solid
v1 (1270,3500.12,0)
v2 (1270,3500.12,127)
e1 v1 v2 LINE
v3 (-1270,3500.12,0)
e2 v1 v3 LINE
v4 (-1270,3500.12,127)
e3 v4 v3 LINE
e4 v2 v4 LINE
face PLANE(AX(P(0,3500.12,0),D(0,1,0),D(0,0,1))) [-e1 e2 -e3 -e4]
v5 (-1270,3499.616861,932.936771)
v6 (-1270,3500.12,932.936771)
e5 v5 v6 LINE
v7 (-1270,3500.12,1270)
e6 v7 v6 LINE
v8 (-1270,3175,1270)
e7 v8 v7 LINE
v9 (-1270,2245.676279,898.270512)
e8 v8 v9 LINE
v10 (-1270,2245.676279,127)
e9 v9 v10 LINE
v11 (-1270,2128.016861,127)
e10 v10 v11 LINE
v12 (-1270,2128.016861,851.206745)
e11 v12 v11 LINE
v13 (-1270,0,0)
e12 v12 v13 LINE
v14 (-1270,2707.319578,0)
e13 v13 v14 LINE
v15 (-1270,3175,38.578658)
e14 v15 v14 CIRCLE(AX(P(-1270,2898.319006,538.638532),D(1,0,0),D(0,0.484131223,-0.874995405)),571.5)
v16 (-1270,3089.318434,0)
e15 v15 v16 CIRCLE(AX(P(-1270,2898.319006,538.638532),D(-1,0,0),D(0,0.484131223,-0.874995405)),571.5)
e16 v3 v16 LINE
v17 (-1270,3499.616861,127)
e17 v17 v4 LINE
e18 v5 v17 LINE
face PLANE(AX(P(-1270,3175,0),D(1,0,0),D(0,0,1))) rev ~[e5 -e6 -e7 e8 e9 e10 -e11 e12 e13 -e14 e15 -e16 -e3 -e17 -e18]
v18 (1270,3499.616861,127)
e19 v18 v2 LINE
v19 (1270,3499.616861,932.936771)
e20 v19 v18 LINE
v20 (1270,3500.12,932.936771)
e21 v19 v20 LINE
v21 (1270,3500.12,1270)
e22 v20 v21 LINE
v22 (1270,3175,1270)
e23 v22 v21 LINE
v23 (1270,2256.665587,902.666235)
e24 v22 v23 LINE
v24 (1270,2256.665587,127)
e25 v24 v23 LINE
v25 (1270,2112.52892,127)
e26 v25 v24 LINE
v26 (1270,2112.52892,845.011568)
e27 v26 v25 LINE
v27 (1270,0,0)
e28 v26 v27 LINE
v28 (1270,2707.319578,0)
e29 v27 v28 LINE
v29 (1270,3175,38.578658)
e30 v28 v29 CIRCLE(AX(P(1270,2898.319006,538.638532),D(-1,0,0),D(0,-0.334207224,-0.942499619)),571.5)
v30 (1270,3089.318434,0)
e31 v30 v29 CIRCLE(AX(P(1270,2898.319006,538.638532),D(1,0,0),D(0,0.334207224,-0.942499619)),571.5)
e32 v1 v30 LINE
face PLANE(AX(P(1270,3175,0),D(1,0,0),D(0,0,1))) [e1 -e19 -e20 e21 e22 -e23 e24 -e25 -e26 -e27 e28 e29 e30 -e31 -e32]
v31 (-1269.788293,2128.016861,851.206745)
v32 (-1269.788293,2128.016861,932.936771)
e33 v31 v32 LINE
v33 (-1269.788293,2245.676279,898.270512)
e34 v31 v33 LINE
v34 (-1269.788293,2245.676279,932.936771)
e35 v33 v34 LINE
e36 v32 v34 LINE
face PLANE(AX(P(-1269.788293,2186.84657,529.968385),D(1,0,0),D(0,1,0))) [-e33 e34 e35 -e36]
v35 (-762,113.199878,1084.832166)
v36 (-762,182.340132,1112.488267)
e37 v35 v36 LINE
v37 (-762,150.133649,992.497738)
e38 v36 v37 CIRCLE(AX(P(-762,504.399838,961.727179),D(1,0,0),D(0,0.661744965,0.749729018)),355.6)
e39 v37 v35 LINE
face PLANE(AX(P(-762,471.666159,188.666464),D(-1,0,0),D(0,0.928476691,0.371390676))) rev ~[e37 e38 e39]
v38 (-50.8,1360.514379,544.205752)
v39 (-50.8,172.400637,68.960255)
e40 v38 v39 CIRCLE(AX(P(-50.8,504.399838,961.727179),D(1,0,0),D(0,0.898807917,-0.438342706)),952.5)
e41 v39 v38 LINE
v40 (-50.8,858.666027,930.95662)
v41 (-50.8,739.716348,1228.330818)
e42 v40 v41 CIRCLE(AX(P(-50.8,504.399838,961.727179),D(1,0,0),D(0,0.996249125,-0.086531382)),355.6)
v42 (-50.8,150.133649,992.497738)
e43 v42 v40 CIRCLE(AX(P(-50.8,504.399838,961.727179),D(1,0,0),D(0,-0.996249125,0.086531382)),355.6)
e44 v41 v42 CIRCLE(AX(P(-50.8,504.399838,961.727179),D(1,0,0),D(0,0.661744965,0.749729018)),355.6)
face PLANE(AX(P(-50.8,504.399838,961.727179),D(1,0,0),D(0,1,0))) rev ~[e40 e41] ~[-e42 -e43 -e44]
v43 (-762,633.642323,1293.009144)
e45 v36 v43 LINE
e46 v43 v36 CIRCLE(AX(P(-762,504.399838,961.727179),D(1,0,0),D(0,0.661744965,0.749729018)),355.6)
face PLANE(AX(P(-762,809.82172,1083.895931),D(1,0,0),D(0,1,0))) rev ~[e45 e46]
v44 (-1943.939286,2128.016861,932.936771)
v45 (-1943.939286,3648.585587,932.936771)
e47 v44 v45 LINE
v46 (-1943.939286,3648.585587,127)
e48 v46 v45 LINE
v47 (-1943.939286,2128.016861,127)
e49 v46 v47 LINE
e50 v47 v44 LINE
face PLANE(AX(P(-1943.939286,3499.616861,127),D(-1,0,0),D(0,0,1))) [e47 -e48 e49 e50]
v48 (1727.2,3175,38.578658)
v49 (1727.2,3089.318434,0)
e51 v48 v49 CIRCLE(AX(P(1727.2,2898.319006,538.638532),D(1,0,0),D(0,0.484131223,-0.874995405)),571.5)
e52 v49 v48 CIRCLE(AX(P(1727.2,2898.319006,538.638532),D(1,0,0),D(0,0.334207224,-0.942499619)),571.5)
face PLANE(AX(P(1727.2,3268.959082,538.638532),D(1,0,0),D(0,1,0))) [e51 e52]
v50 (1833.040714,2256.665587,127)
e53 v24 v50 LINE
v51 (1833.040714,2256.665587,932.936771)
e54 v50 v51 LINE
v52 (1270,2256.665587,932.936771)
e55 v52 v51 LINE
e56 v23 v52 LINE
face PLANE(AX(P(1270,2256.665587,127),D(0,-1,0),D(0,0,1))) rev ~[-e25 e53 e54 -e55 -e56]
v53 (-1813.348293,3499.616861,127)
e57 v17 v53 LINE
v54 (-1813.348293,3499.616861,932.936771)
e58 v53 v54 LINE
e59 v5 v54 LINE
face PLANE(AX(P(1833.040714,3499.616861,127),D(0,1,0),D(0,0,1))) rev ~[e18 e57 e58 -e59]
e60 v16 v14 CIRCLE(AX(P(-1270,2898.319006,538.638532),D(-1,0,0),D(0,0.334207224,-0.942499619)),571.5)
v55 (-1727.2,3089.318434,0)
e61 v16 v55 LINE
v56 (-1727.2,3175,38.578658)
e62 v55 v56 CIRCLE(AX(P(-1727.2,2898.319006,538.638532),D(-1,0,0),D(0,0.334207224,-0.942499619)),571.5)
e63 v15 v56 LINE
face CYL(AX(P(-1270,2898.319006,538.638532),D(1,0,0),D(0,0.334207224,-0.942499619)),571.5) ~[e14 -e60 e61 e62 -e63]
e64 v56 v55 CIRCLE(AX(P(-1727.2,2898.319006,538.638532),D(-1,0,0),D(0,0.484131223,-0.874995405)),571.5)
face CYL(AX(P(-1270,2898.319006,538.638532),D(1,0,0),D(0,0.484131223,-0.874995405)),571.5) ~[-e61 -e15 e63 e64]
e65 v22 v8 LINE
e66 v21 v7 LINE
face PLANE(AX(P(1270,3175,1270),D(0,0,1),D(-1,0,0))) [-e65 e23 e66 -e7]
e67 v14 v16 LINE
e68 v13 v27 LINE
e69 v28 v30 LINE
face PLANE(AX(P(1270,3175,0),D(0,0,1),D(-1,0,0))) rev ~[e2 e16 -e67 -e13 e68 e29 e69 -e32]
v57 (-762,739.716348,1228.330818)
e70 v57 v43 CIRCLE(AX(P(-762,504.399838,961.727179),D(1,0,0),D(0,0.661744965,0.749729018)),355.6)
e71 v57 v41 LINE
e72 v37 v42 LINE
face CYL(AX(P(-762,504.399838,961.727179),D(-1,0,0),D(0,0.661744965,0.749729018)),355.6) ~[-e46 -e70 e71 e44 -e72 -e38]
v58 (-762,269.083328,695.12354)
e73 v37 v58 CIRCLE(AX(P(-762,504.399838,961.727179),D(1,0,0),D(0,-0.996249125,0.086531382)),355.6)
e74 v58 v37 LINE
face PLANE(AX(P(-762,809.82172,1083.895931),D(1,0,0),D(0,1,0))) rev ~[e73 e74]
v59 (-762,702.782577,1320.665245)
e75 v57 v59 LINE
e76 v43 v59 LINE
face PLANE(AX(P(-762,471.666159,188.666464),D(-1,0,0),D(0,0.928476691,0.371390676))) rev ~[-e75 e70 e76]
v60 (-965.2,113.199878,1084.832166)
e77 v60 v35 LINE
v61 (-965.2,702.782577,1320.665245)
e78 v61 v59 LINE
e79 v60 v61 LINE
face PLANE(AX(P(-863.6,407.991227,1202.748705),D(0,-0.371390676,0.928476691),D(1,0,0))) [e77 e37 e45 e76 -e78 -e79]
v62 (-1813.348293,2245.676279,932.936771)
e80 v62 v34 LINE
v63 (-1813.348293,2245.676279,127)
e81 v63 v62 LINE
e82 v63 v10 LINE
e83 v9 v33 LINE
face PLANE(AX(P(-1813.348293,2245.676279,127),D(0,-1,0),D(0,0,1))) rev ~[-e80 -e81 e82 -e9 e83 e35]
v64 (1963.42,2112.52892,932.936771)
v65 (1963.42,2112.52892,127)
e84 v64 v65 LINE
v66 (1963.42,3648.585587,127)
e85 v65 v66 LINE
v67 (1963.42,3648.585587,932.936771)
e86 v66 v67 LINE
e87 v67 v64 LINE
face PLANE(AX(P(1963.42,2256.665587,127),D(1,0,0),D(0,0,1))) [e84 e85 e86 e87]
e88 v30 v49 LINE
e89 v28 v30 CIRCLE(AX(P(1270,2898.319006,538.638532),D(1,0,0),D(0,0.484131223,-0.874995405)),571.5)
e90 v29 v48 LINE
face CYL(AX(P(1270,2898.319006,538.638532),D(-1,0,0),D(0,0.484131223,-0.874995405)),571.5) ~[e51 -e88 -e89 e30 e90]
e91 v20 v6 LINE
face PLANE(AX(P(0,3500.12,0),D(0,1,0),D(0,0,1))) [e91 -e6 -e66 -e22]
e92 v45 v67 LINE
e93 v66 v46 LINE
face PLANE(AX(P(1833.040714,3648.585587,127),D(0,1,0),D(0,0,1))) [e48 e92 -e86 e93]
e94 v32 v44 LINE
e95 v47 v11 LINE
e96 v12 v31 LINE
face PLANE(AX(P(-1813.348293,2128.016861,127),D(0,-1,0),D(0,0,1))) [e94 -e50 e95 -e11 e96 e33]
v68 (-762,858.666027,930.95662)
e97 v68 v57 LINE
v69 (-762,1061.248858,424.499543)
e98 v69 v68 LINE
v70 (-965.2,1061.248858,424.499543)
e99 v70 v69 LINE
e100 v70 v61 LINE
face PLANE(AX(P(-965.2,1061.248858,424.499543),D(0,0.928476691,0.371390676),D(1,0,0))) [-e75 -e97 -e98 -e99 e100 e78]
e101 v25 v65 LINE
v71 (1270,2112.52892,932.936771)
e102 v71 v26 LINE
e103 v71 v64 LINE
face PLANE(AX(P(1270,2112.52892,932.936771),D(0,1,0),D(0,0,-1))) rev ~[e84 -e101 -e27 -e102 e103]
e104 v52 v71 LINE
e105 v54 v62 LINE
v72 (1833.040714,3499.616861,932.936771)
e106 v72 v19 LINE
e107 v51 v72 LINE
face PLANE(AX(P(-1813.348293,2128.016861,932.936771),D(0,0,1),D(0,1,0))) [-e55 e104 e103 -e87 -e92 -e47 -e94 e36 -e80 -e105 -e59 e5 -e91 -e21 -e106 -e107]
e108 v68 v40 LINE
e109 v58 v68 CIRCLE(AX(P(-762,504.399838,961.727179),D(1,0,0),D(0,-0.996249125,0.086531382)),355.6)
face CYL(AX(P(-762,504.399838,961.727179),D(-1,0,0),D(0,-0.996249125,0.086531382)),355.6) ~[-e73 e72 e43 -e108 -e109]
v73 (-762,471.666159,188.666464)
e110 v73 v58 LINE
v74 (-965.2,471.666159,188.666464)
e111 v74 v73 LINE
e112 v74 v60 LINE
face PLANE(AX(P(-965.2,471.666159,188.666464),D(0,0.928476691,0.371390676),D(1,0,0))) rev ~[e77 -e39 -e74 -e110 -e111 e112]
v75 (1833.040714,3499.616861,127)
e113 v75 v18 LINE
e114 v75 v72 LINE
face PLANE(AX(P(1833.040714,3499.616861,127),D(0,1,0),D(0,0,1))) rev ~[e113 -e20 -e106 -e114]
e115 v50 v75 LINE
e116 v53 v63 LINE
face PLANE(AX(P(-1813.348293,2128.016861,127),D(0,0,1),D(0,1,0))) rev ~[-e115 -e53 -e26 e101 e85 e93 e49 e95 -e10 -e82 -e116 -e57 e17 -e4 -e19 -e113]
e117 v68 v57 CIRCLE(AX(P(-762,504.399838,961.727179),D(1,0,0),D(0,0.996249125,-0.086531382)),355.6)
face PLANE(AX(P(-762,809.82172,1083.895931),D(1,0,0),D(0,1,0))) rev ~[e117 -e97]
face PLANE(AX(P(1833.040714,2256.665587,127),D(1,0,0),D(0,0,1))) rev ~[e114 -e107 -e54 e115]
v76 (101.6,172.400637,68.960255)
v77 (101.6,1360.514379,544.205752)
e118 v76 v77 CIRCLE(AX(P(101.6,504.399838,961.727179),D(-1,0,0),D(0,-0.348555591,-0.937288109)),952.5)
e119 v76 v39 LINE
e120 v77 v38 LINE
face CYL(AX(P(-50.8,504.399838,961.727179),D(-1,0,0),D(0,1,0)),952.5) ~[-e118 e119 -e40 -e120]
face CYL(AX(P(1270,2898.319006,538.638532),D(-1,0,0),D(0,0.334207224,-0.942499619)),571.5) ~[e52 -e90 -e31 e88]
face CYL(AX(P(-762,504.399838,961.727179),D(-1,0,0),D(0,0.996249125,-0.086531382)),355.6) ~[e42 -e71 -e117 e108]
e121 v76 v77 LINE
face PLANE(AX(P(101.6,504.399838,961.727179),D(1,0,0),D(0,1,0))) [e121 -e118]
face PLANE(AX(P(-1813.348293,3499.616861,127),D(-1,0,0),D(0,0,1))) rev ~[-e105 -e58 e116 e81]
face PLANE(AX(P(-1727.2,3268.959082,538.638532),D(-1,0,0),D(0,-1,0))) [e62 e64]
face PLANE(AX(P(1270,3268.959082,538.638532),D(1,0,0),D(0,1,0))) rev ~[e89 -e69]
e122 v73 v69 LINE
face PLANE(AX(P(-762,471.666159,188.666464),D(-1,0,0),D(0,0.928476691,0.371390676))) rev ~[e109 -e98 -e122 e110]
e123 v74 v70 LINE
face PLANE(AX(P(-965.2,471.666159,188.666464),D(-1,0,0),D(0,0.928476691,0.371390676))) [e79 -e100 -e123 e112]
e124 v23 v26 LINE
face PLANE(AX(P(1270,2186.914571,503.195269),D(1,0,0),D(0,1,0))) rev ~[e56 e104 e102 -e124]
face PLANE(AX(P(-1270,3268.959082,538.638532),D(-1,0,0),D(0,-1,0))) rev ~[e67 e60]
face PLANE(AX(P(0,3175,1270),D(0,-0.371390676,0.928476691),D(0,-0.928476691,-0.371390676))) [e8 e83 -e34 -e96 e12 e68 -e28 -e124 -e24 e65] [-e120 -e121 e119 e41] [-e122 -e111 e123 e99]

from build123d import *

# Parameters (mm, degrees)
F1_DEPTH  = 1270
F3_DEPTH  = 457.2
F5_DEPTH  = 457.2
F7_DEPTH  = 693.42
F8_W      = 130.3792857361
F8_H      = 805.9367705113
F9_DEPTH  = 1391.92
F10_W     = 148.9687260818
F10_H     = 805.9367705113
F11_DEPTH = 3776.98
F12_W     = 130.5909924316
F12_H     = 805.9367705113
F13_DEPTH = 1371.6
F14_W     = 117.6594177246
F14_H     = 805.9367705113
F15_DEPTH = 543.56
F16_W     = 203.2
F16_H     = 635
F17_DEPTH = 965.2
F19_DEPTH = 711.2
F20_R     = 952.5
F21_DEPTH = 152.4
F22_DEPTH = 325.12


with BuildPart() as f1:
    # F0 (on Right) → F1 (new body, symmetric)
    with BuildSketch(Plane.YZ):
        Polygon((3175, 1270), (0, 0), (3175, 0), align=None)
    extrude(amount=F1_DEPTH, both=True)

    # F2 (on face) → F3 (join)
    with BuildSketch(Plane.YZ.offset(1270)):
        with BuildLine():
            ThreePointArc((3175, 38.5786582061), (3390.6275667745, 248.389447831), (3469.8190059662, 538.6385321617))
            ThreePointArc((3469.8190059662, 538.6385321617), (3390.6275667745, 828.8876164925), (3175, 1038.6984061173))
            Line((3175, 1038.6984061173), (3175, 38.5786582061))
        make_face()
        with BuildLine():
            Line((3175, 38.5786582061), (3175, 1038.6984061173))
            ThreePointArc((3175, 1038.6984061173), (2377.2058441792, 773.2729768036), (2707.3195775098, 0))
            Line((2707.3195775098, 0), (3089.3184344226, 0))
            ThreePointArc((3089.3184344226, 0), (3132.9534506081, 17.5253703748), (3175, 38.5786582061))
        make_face()
        with BuildLine():
            Line((3089.3184344226, 0), (2707.3195775098, 0))
            ThreePointArc((2707.3195775098, 0), (2898.3190059662, -32.8614678383), (3089.3184344226, 0))
        make_face()
    extrude(amount=F3_DEPTH)

    # F4 (on face) → F5 (join)
    with BuildSketch(Plane(origin=(-1270, 0, 0), x_dir=(0, -1, 0), z_dir=(-1, 0, 0))):
        with BuildLine():
            Line((-3175, 38.5786582061), (-3175, 1038.6984061173))
            ThreePointArc((-3175, 1038.6984061173), (-3469.8190059662, 538.6385321617), (-3175, 38.5786582061))
        make_face()
        with BuildLine():
            ThreePointArc((-3089.3184344226, 0), (-2898.3190059662, -32.8614678383), (-2707.3195775098, 0))
            Line((-2707.3195775098, 0), (-3089.3184344226, 0))
        make_face()
        with BuildLine():
            ThreePointArc((-2707.3195775098, 0), (-2431.538316904, 208.8991831016), (-2326.8190059662, 538.6385321617))
            ThreePointArc((-2326.8190059662, 538.6385321617), (-2608.0699216354, 1030.94709297), (-3175, 1038.6984061173))
            Line((-3175, 1038.6984061173), (-3175, 38.5786582061))
            ThreePointArc((-3175, 38.5786582061), (-3132.9534506081, 17.5253703748), (-3089.3184344226, 0))
            Line((-3089.3184344226, 0), (-2707.3195775098, 0))
        make_face()
    extrude(amount=F5_DEPTH)

    # F6 (on face) → F7 (join)
    with BuildSketch(Plane.YZ.offset(1270)):
        Polygon((2112.5289201736, 127), (2256.6655874252, 127), (2256.6655874252, 902.6662349701), (2112.5289201736, 845.0115680695), align=None)
        Polygon((2112.5289201736, 845.0115680695), (2256.6655874252, 902.6662349701), (2256.6655874252, 932.9367705113), (2112.5289201736, 932.9367705113), align=None)
    extrude(amount=F7_DEPTH)

    # F8 (on face) → F9 (join)
    with BuildSketch(Plane(origin=(0, 2256.6655874252, 0), x_dir=(-1, 0, 0), z_dir=(0, 1, 0))):
        with Locations((-1898.230357132, 529.9683852557)):
            Rectangle(F8_W, F8_H)
    extrude(amount=F9_DEPTH)

    # F10 (on face) → F11 (join)
    with BuildSketch(Plane(origin=(1833.0407142639, 0, 0), x_dir=(0, -1, 0), z_dir=(-1, 0, 0))):
        with Locations((-3574.1012243843, 529.9683852557)):
            Rectangle(F10_W, F10_H)
    extrude(amount=F11_DEPTH)

    # F12 (on face) → F13 (join)
    with BuildSketch(Plane.XZ.offset(-3499.6168613434)):
        with Locations((-1878.6437895203, 529.9683852557)):
            Rectangle(F12_W, F12_H)
    extrude(amount=F13_DEPTH)

    # F14 (on face) → F15 (join)
    with BuildSketch(Plane.YZ.offset(-1813.3482933044)):
        with Locations((2186.8465702057, 529.9683852557)):
            Rectangle(F14_W, F14_H)
    extrude(amount=F15_DEPTH)

    # F16 (on face) → F17 (join)
    with BuildSketch(Plane(origin=(0, 0, 0), x_dir=(1, 0, 0), z_dir=(0, -0.3713906764, 0.9284766909))):
        with Locations((-863.6, 825.5)):
            Rectangle(F16_W, F16_H)
    extrude(amount=F17_DEPTH)

    # F18 (on face) → F19 (join)
    with BuildSketch(Plane.YZ.offset(-762)):
        with BuildLine():
            ThreePointArc((858.6660271031, 930.9566195196), (859.6662288573, 946.3274518263), (859.9998380943, 961.7271789091))
            ThreePointArc((859.9998380943, 961.7271789091), (828.5370859157, 1107.9680917029), (739.7163477975, 1228.3308177835))
            Line((739.7163477975, 1228.3308177835), (858.6660271031, 930.9566195196))
        make_face()
        with BuildLine():
            Line((858.6660271031, 930.9566195196), (739.7163477975, 1228.3308177835))
            ThreePointArc((739.7163477975, 1228.3308177835), (689.5258400202, 1265.3383173921), (633.6423229739, 1293.0091435588))
            Line((633.6423229739, 1293.0091435588), (182.3401320437, 1112.4882671867))
            ThreePointArc((182.3401320437, 1112.4882671867), (160.9560860217, 1053.9104157926), (150.1336490854, 992.4977382986))
            Line((150.1336490854, 992.4977382986), (269.083328391, 695.1235400347))
            ThreePointArc((269.083328391, 695.1235400347), (636.4663626058, 631.5608676303), (858.6660271031, 930.9566195196))
        make_face()
        with BuildLine():
            Line((182.3401320437, 1112.4882671867), (633.6423229739, 1293.0091435588))
            ThreePointArc((633.6423229739, 1293.0091435588), (372.3333135827, 1291.8934901879), (182.3401320437, 1112.4882671867))
        make_face()
        with BuildLine():
            ThreePointArc((150.1336490854, 992.4977382986), (174.2335268155, 829.6606543976), (269.083328391, 695.1235400347))
            Line((269.083328391, 695.1235400347), (150.1336490854, 992.4977382986))
        make_face()
    extrude(amount=F19_DEPTH)

    # F20 (on face) → F21 (join)
    with BuildSketch(Plane.YZ.offset(-50.8)):
        with Locations((504.3998380943, 961.7271789091)):
            Circle(F20_R)
    extrude(amount=F21_DEPTH)

    # F22 (add): a face of the model
    f22_faces = [f1.faces().sort_by_distance(p)[0] for p in [
        (0, 3175, 635),
    ]]
    extrude(f22_faces, amount=F22_DEPTH)


solid = f1.part
